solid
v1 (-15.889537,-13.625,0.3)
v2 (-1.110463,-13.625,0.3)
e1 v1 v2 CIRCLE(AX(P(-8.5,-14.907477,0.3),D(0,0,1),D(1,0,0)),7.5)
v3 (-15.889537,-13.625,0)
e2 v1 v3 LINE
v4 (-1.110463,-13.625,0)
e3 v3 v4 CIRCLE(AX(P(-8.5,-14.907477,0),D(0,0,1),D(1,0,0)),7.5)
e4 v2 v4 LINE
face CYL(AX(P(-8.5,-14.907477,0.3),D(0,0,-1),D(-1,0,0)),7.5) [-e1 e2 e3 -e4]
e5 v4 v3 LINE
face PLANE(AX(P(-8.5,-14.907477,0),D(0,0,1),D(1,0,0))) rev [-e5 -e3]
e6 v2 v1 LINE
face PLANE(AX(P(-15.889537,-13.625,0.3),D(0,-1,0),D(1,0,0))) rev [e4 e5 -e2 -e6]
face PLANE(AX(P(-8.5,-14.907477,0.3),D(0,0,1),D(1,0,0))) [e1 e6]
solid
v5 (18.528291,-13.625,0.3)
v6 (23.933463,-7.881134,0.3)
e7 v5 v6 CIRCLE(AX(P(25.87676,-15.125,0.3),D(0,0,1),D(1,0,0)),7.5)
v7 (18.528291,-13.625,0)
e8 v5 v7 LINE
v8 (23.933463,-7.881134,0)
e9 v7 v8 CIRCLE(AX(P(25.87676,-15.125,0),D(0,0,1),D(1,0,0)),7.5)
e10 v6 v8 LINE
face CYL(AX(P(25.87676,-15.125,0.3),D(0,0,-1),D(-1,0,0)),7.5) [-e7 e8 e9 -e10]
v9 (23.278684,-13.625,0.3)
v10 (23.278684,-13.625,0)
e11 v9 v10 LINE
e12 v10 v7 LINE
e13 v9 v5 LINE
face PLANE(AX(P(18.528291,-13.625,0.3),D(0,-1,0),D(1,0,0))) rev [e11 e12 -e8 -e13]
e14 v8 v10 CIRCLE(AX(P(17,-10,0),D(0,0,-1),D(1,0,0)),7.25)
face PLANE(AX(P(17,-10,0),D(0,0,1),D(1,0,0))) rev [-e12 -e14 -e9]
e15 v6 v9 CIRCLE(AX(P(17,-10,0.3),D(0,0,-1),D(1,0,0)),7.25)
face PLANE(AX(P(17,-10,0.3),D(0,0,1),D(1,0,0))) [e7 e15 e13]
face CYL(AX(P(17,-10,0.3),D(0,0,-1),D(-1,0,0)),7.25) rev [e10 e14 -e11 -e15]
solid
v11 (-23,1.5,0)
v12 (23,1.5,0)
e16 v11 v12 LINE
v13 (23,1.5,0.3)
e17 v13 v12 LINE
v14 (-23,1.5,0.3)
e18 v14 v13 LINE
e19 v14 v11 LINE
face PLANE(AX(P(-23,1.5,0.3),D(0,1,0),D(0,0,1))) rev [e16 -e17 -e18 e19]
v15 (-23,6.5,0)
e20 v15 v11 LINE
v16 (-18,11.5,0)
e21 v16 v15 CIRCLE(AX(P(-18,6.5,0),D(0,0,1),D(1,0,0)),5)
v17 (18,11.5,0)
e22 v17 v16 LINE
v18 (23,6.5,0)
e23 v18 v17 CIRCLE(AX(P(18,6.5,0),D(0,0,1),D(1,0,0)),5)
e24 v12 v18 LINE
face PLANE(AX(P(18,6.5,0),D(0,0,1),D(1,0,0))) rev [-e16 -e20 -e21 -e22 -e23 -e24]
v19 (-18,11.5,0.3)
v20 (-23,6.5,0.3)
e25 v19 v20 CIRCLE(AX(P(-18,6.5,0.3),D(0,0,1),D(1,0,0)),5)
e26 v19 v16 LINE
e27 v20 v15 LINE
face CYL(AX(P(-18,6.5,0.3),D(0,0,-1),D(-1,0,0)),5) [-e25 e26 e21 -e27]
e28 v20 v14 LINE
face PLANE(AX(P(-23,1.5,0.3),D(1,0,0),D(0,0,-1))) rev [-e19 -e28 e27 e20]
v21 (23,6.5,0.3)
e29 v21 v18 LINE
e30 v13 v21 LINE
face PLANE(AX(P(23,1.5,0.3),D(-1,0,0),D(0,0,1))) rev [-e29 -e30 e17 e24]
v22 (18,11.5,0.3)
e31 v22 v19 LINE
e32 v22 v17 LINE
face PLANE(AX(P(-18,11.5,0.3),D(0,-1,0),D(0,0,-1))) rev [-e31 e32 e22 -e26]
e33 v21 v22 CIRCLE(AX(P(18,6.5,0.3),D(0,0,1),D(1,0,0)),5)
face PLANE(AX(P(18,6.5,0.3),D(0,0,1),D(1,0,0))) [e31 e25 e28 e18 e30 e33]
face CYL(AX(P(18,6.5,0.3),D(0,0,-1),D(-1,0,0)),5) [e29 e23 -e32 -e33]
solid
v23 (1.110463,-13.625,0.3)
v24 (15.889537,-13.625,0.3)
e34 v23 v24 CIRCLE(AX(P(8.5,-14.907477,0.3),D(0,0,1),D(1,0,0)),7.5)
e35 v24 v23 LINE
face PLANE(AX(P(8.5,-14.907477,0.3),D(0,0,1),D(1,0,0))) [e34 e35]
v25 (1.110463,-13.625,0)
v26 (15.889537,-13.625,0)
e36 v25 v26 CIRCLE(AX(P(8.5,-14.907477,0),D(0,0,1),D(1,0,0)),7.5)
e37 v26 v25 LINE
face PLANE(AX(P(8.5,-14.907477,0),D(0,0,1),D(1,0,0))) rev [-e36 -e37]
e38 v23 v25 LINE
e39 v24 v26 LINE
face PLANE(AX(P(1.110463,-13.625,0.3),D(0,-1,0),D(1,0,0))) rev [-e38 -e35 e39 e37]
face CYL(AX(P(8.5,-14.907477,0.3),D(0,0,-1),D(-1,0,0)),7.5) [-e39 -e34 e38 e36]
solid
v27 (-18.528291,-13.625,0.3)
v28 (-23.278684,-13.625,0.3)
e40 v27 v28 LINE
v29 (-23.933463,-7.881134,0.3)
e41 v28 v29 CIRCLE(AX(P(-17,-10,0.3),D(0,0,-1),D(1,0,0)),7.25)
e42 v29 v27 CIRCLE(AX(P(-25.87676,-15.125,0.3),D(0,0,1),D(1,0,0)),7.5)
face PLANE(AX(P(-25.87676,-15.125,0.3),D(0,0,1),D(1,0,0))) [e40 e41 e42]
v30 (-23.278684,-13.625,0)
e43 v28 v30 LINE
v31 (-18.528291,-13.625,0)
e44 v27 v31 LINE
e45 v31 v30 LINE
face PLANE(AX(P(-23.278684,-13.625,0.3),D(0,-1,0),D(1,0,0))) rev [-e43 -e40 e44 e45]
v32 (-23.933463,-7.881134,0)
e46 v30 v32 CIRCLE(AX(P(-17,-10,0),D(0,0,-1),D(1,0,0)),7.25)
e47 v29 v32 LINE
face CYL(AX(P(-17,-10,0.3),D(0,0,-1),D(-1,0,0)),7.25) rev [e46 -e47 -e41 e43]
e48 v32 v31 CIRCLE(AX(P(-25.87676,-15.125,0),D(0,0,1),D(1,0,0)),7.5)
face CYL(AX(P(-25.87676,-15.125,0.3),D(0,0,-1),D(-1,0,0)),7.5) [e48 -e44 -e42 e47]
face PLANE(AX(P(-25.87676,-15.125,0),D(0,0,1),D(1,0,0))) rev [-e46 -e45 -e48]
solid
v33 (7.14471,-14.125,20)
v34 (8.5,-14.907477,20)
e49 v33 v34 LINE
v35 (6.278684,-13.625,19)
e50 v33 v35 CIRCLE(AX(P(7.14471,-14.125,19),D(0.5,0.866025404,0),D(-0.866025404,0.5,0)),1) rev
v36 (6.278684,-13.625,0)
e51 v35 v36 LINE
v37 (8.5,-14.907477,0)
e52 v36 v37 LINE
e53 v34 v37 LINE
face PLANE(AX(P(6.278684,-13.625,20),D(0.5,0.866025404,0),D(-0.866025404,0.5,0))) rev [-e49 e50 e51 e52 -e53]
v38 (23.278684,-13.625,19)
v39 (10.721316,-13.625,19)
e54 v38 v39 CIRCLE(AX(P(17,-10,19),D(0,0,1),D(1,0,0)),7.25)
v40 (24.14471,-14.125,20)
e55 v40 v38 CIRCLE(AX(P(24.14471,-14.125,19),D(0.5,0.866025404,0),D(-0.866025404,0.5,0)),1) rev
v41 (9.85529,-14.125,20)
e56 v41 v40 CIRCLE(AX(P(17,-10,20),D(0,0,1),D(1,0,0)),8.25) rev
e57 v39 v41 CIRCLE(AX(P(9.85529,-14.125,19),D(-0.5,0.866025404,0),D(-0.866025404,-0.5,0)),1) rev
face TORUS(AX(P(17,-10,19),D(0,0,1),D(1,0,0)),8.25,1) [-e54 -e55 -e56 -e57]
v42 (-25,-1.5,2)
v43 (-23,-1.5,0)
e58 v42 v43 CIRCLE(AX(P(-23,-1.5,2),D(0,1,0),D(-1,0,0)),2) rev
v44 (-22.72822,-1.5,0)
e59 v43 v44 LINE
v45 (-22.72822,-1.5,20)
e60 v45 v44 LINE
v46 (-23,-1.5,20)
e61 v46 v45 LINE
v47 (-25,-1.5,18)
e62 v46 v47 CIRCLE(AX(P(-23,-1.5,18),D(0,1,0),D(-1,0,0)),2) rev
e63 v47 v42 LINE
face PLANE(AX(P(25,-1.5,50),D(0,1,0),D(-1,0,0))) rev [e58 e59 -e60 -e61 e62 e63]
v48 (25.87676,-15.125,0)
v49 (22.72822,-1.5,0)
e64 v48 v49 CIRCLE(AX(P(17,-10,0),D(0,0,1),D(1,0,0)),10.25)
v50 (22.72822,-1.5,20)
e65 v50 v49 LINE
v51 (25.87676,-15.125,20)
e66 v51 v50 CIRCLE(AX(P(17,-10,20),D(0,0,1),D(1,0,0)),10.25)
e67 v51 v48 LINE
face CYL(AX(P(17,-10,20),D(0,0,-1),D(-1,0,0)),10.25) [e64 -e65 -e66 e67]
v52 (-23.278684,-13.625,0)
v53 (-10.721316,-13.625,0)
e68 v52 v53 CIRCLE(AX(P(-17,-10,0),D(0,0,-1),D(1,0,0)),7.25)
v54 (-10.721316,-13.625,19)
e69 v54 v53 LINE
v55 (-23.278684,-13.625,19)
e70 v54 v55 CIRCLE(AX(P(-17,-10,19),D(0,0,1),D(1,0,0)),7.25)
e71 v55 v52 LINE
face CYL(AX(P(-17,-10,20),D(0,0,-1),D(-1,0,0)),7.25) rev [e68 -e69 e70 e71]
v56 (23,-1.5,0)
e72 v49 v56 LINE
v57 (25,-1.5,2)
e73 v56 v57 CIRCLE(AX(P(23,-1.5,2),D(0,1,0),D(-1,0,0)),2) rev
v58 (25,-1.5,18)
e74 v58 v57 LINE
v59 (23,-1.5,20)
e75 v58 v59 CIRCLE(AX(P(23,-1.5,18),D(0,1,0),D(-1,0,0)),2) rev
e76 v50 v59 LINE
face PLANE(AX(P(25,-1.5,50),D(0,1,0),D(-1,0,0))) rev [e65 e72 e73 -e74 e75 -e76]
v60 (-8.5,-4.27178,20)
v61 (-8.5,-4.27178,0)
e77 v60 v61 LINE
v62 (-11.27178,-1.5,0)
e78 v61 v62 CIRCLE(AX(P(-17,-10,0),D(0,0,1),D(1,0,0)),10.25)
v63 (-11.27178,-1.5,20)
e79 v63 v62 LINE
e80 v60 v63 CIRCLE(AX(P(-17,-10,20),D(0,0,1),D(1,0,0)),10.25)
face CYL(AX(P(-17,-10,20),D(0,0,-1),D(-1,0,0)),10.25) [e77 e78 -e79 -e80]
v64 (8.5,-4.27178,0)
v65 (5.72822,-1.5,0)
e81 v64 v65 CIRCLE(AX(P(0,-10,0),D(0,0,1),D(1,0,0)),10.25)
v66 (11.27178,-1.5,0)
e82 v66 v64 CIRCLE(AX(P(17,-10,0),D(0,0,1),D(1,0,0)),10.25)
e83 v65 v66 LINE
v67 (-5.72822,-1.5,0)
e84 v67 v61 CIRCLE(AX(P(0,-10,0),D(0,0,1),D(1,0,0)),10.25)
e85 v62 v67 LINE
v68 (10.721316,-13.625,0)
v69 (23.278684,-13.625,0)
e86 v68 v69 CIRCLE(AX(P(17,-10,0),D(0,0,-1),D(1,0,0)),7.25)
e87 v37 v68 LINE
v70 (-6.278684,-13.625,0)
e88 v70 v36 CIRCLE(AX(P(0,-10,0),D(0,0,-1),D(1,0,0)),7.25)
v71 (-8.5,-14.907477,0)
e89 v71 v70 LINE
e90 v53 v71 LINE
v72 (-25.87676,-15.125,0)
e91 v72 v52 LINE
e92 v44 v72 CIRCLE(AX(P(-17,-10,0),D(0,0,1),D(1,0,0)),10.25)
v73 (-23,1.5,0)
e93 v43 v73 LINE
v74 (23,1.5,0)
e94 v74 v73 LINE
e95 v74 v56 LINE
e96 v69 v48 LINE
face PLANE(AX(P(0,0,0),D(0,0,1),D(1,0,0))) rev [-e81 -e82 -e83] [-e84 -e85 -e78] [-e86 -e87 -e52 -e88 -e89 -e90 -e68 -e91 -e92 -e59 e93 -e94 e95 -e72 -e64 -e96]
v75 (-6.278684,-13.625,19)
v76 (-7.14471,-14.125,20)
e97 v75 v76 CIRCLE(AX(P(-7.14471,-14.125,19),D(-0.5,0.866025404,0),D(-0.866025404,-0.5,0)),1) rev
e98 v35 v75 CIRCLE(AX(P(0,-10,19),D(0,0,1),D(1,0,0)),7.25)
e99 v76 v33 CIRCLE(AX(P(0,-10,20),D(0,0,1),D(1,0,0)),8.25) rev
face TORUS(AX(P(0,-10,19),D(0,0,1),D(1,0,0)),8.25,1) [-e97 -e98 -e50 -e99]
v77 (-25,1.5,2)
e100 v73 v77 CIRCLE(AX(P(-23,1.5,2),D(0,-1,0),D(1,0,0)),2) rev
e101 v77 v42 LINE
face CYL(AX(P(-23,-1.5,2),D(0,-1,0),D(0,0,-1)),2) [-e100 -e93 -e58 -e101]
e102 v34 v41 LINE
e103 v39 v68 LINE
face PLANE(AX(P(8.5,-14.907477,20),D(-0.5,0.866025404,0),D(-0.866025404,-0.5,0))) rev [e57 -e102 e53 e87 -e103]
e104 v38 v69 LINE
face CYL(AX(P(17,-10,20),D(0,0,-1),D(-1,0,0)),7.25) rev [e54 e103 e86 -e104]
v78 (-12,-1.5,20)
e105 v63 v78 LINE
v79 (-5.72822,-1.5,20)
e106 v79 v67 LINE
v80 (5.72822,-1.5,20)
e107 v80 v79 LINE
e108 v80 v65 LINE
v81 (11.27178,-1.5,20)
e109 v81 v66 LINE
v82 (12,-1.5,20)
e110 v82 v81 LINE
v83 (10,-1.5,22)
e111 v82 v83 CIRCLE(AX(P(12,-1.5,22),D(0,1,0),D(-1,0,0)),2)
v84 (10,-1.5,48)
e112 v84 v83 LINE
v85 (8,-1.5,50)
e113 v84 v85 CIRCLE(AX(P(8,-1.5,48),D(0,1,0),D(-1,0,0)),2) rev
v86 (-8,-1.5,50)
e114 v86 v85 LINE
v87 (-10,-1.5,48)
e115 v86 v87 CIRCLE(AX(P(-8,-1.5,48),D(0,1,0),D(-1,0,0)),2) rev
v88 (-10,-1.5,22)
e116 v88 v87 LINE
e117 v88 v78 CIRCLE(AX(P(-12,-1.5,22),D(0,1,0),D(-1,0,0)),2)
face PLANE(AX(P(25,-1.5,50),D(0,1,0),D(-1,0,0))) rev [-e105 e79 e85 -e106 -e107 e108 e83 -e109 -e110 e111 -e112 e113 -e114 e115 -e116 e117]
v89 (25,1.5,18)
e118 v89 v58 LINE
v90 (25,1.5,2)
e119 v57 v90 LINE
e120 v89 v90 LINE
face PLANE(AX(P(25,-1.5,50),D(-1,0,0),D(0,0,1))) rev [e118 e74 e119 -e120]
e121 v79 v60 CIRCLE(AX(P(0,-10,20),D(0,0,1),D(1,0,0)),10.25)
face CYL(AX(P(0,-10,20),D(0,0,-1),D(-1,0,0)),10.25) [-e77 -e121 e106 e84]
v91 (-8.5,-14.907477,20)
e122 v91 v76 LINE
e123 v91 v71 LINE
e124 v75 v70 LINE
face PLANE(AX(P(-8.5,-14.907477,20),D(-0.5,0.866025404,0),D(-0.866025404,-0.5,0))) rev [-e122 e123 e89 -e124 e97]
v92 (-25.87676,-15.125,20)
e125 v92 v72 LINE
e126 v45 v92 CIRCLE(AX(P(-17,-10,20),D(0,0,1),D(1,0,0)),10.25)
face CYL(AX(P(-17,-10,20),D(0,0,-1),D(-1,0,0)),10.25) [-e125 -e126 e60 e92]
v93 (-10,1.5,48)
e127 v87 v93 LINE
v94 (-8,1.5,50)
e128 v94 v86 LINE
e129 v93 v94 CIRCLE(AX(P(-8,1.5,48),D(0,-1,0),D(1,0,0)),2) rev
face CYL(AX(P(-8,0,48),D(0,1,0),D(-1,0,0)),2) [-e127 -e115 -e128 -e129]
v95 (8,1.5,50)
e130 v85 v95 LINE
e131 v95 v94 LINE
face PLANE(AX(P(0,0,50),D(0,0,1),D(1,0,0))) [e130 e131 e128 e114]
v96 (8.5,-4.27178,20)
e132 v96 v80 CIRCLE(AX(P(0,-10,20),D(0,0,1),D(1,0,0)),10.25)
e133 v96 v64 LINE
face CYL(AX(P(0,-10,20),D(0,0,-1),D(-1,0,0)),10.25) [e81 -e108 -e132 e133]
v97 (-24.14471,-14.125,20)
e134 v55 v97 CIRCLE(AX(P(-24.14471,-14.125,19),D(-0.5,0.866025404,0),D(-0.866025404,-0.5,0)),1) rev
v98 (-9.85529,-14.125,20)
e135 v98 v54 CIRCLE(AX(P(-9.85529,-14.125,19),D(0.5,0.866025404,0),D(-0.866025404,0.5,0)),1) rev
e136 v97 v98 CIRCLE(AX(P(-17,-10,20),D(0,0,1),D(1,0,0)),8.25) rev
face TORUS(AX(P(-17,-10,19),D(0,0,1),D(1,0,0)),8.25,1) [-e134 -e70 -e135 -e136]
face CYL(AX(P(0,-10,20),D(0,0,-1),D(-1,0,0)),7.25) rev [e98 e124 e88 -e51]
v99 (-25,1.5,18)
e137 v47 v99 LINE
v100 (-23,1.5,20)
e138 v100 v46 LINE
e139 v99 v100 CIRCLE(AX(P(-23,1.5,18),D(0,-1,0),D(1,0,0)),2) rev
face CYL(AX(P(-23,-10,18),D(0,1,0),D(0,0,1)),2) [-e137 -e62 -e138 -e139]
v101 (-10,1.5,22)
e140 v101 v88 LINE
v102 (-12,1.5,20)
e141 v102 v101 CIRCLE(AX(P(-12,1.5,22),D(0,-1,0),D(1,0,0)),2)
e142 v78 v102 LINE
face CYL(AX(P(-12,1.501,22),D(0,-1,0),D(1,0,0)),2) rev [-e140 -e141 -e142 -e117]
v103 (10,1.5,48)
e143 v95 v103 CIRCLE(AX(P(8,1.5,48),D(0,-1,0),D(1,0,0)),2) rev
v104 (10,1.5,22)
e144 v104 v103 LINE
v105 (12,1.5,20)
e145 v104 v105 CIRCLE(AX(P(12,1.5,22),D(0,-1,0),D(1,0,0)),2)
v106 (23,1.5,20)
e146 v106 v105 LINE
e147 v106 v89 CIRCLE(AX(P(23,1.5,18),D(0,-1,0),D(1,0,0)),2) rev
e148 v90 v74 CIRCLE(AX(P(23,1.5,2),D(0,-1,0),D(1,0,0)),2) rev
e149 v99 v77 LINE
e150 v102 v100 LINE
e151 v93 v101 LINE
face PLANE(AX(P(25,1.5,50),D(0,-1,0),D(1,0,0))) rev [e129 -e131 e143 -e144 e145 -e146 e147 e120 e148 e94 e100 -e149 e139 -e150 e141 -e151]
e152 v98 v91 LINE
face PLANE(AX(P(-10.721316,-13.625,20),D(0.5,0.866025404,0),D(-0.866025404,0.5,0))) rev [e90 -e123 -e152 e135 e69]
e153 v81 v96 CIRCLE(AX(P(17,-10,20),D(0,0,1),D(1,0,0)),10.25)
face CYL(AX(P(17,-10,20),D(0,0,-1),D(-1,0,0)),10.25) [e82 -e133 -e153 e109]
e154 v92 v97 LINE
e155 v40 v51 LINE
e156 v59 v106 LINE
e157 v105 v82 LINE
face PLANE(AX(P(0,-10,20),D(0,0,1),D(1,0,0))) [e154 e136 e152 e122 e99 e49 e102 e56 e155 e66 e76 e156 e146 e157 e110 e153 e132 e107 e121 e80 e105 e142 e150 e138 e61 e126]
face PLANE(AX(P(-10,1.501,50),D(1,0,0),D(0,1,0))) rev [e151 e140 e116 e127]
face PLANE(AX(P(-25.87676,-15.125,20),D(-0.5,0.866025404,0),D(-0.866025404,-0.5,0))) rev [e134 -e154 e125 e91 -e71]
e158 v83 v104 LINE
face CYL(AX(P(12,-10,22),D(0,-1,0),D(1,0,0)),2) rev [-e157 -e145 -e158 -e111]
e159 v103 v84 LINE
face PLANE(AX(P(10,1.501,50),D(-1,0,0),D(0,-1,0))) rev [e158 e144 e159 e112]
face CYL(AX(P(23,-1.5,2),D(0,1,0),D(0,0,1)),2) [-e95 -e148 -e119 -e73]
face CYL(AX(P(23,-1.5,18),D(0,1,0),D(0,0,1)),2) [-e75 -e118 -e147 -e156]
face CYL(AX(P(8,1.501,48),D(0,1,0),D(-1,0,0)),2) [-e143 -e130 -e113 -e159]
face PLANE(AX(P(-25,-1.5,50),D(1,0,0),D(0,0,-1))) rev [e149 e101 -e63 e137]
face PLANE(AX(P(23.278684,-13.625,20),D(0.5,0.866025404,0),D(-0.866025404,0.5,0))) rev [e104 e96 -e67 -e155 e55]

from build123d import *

# Parameters (mm, degrees)
SKETCH1_W             = 50
SKETCH1_H             = 3
WALL_MOUNT_DEPTH      = 50
BOSS_EXTRUDE3_DEPTH   = 20
CUT_EXTRUDE1_REACH    = 60.551
SKETCH4_W             = 15
SKETCH4_H             = 30
FILLET2_R             = 2
FILLET3_R             = 1
BOSS_EXTRUDE4_DEPTH   = 0.3
BOSS_EXTRUDE4_2_DEPTH = 0.3
BOSS_EXTRUDE4_3_DEPTH = 0.3
BOSS_EXTRUDE4_4_DEPTH = 0.3
BOSS_EXTRUDE4_5_DEPTH = 0.3


with BuildPart() as part:
    # Sketch1 → Wall mount (new body)
    with BuildSketch(Plane.XY):
        Rectangle(SKETCH1_W, SKETCH1_H)
    extrude(amount=WALL_MOUNT_DEPTH)

    # Sketch3 → Boss-Extrude3 (add)
    with BuildSketch(Plane.XY):
        with BuildLine():
            Line((-8.5, -14.907477288), (-6.278684177, -13.625))
            ThreePointArc((-6.278684177, -13.625), (0, -2.75), (6.278684177, -13.625))
            Line((6.278684177, -13.625), (8.5, -14.907477288))
            Line((8.5, -14.907477288), (10.721315823, -13.625))
            ThreePointArc((10.721315823, -13.625), (17, -2.75), (23.278684177, -13.625))
            Line((23.278684177, -13.625), (25.876760389, -15.125))
            ThreePointArc((25.876760389, -15.125), (26.986817136, -7.692190758), (22.728219619, -1.5))
            Line((22.728219619, -1.5), (11.271780381, -1.5))
            ThreePointArc((11.271780381, -1.5), (9.752155493, -2.752155493), (8.5, -4.271780381))
            ThreePointArc((8.5, -4.271780381), (7.247844507, -2.752155493), (5.728219619, -1.5))
            Line((5.728219619, -1.5), (-5.728219619, -1.5))
            ThreePointArc((-5.728219619, -1.5), (-7.247844507, -2.752155493), (-8.5, -4.271780381))
            ThreePointArc((-8.5, -4.271780381), (-9.752155493, -2.752155493), (-11.271780381, -1.5))
            Line((-11.271780381, -1.5), (-22.728219619, -1.5))
            ThreePointArc((-22.728219619, -1.5), (-26.986817136, -7.692190758), (-25.876760389, -15.125))
            Line((-25.876760389, -15.125), (-23.278684177, -13.625))
            ThreePointArc((-23.278684177, -13.625), (-17, -2.75), (-10.721315823, -13.625))
            Line((-10.721315823, -13.625), (-8.5, -14.907477288))
        make_face()
    extrude(amount=BOSS_EXTRUDE3_DEPTH)

    # Sketch4 → Cut-Extrude1 (cut, up to next)
    with BuildSketch(Plane.XZ.offset(1.5), mode=Mode.PRIVATE) as cut_extrude1_sk1:
        with Locations((-17.5, 35)):
            Rectangle(SKETCH4_W, SKETCH4_H)
    cut_extrude1_tool1 = extrude(cut_extrude1_sk1.sketch, amount=-CUT_EXTRUDE1_REACH, mode=Mode.PRIVATE) & part.part
    # Sketch4 → Cut-Extrude1 (cut, up to next)
    with BuildSketch(Plane.XZ.offset(1.5), mode=Mode.PRIVATE) as cut_extrude1_sk2:
        with Locations((17.5, 35)):
            Rectangle(SKETCH4_W, SKETCH4_H)
    cut_extrude1_tool2 = extrude(cut_extrude1_sk2.sketch, amount=-CUT_EXTRUDE1_REACH, mode=Mode.PRIVATE) & part.part
    add(cut_extrude1_tool1.solids().sort_by_distance((-17.5, -1.5, 35))[0], mode=Mode.SUBTRACT)
    add(cut_extrude1_tool2.solids().sort_by_distance((17.5, -1.5, 35))[0], mode=Mode.SUBTRACT)

    # Fillet2
    # the kernel refuses this fillet: 2 mm, written as the material it adds along each edge
    with BuildSketch(Plane(origin=(-10, -1.5, 20), x_dir=(-1, 0, 0), z_dir=(0, 1, 0))) as fillet2_piece_1:
        with BuildLine():
            CenterArc((FILLET2_R, FILLET2_R), FILLET2_R, 180, 90)
            Line((0, FILLET2_R), (0, 0))
            Line((0, 0), (FILLET2_R, 0))
        make_face()
    extrude(amount=3)
    with BuildSketch(Plane(origin=(10, -1.5, 20), x_dir=(1, 0, 0), z_dir=(0, 1, 0))) as fillet2_piece_2:
        with BuildLine():
            CenterArc((FILLET2_R, -FILLET2_R), FILLET2_R, 90, 90)
            Line((0, -FILLET2_R), (0, 0))
            Line((0, 0), (FILLET2_R, 0))
        make_face()
    extrude(amount=3)
    # the kernel refuses this fillet: 2 mm, written as the material it takes off along each edge
    with BuildSketch(Plane(origin=(25, 6.5, 0), x_dir=(-1, 0, 0), z_dir=(0, -1, 0)), Plane(origin=(-25, -1.5, 0), x_dir=(1, 0, 0), z_dir=(0, 1, 0)), Plane(origin=(25, -1.5, 20), x_dir=(-1, 0, 0), z_dir=(0, 1, 0))) as fillet2_2_piece_1:
        with BuildLine():
            CenterArc((FILLET2_R, -FILLET2_R), FILLET2_R, 90, 90)
            Line((0, -FILLET2_R), (0, 0))
            Line((0, 0), (FILLET2_R, 0))
        make_face()
    extrude(amount=8, mode=Mode.SUBTRACT)
    with BuildSketch(Plane(origin=(-10, -6.5, 50), x_dir=(1, 0, 0), z_dir=(0, 1, 0)), Plane(origin=(10, -6.5, 50), x_dir=(0, 0, -1), z_dir=(0, 1, 0))) as fillet2_2_piece_2:
        with BuildLine():
            CenterArc((FILLET2_R, FILLET2_R), FILLET2_R, 180, 90)
            Line((0, FILLET2_R), (0, 0))
            Line((0, 0), (FILLET2_R, 0))
        make_face()
    extrude(amount=13, mode=Mode.SUBTRACT)
    with BuildSketch(Plane(origin=(-25, -1.5, 20), x_dir=(1, 0, 0), z_dir=(0, 1, 0))) as fillet2_2_piece_3:
        with BuildLine():
            CenterArc((FILLET2_R, FILLET2_R), FILLET2_R, 180, 90)
            Line((0, FILLET2_R), (0, 0))
            Line((0, 0), (FILLET2_R, 0))
        make_face()
    extrude(amount=8, mode=Mode.SUBTRACT)

    # Fillet3
    fillet3_edges = [part.edges().sort_by_distance(p)[0] for p in [
        (0, -2.75, 20),
        (17, -2.75, 20),
        (-17, -2.75, 20),
    ]]
    fillet(fillet3_edges, radius=FILLET3_R)


with BuildPart() as body_2:
    # Sketch5 → Boss-Extrude4 (new body)
    with BuildSketch(Plane.XY):
        with BuildLine():
            Line((-23.278684177, -13.625), (-18.52829116, -13.625))
            ThreePointArc((-18.52829116, -13.625), (-31.338649406, -20.264821822), (-23.933462834, -7.881134001))
            ThreePointArc((-23.933462834, -7.881134001), (-24.203346883, -10.821153871), (-23.278684177, -13.625))
        make_face()
    extrude(amount=BOSS_EXTRUDE4_DEPTH)


with BuildPart() as body_3:
    # Sketch5 → Boss-Extrude4 2 (new body)
    with BuildSketch(Plane.XY):
        with BuildLine():
            Line((-23, 1.5), (23, 1.5))
            Line((23, 1.5), (23, 6.5))
            ThreePointArc((23, 6.5), (21.535533906, 10.035533906), (18, 11.5))
            Line((18, 11.5), (-18, 11.5))
            ThreePointArc((-18, 11.5), (-21.535533906, 10.035533906), (-23, 6.5))
            Line((-23, 6.5), (-23, 1.5))
        make_face()
    extrude(amount=BOSS_EXTRUDE4_2_DEPTH)


with BuildPart() as body_4:
    # Sketch5 → Boss-Extrude4 3 (new body)
    with BuildSketch(Plane.XY):
        with BuildLine():
            Line((-15.889536657, -13.625), (-1.110463343, -13.625))
            ThreePointArc((-1.110463343, -13.625), (-8.5, -22.407477288), (-15.889536657, -13.625))
        make_face()
    extrude(amount=BOSS_EXTRUDE4_3_DEPTH)


with BuildPart() as body_5:
    # Sketch5 → Boss-Extrude4 4 (new body)
    with BuildSketch(Plane.XY):
        with BuildLine():
            Line((1.110463343, -13.625), (15.889536657, -13.625))
            ThreePointArc((15.889536657, -13.625), (8.5, -22.407477288), (1.110463343, -13.625))
        make_face()
    extrude(amount=BOSS_EXTRUDE4_4_DEPTH)


with BuildPart() as body_6:
    # Sketch5 → Boss-Extrude4 5 (new body)
    with BuildSketch(Plane.XY):
        with BuildLine():
            Line((18.52829116, -13.625), (23.278684177, -13.625))
            ThreePointArc((23.278684177, -13.625), (24.203346883, -10.821153871), (23.933462834, -7.881134001))
            ThreePointArc((23.933462834, -7.881134001), (31.338649406, -20.264821822), (18.52829116, -13.625))
        make_face()
    extrude(amount=BOSS_EXTRUDE4_5_DEPTH)


solid = Compound([part.part, body_2.part, body_3.part, body_4.part, body_5.part, body_6.part])
